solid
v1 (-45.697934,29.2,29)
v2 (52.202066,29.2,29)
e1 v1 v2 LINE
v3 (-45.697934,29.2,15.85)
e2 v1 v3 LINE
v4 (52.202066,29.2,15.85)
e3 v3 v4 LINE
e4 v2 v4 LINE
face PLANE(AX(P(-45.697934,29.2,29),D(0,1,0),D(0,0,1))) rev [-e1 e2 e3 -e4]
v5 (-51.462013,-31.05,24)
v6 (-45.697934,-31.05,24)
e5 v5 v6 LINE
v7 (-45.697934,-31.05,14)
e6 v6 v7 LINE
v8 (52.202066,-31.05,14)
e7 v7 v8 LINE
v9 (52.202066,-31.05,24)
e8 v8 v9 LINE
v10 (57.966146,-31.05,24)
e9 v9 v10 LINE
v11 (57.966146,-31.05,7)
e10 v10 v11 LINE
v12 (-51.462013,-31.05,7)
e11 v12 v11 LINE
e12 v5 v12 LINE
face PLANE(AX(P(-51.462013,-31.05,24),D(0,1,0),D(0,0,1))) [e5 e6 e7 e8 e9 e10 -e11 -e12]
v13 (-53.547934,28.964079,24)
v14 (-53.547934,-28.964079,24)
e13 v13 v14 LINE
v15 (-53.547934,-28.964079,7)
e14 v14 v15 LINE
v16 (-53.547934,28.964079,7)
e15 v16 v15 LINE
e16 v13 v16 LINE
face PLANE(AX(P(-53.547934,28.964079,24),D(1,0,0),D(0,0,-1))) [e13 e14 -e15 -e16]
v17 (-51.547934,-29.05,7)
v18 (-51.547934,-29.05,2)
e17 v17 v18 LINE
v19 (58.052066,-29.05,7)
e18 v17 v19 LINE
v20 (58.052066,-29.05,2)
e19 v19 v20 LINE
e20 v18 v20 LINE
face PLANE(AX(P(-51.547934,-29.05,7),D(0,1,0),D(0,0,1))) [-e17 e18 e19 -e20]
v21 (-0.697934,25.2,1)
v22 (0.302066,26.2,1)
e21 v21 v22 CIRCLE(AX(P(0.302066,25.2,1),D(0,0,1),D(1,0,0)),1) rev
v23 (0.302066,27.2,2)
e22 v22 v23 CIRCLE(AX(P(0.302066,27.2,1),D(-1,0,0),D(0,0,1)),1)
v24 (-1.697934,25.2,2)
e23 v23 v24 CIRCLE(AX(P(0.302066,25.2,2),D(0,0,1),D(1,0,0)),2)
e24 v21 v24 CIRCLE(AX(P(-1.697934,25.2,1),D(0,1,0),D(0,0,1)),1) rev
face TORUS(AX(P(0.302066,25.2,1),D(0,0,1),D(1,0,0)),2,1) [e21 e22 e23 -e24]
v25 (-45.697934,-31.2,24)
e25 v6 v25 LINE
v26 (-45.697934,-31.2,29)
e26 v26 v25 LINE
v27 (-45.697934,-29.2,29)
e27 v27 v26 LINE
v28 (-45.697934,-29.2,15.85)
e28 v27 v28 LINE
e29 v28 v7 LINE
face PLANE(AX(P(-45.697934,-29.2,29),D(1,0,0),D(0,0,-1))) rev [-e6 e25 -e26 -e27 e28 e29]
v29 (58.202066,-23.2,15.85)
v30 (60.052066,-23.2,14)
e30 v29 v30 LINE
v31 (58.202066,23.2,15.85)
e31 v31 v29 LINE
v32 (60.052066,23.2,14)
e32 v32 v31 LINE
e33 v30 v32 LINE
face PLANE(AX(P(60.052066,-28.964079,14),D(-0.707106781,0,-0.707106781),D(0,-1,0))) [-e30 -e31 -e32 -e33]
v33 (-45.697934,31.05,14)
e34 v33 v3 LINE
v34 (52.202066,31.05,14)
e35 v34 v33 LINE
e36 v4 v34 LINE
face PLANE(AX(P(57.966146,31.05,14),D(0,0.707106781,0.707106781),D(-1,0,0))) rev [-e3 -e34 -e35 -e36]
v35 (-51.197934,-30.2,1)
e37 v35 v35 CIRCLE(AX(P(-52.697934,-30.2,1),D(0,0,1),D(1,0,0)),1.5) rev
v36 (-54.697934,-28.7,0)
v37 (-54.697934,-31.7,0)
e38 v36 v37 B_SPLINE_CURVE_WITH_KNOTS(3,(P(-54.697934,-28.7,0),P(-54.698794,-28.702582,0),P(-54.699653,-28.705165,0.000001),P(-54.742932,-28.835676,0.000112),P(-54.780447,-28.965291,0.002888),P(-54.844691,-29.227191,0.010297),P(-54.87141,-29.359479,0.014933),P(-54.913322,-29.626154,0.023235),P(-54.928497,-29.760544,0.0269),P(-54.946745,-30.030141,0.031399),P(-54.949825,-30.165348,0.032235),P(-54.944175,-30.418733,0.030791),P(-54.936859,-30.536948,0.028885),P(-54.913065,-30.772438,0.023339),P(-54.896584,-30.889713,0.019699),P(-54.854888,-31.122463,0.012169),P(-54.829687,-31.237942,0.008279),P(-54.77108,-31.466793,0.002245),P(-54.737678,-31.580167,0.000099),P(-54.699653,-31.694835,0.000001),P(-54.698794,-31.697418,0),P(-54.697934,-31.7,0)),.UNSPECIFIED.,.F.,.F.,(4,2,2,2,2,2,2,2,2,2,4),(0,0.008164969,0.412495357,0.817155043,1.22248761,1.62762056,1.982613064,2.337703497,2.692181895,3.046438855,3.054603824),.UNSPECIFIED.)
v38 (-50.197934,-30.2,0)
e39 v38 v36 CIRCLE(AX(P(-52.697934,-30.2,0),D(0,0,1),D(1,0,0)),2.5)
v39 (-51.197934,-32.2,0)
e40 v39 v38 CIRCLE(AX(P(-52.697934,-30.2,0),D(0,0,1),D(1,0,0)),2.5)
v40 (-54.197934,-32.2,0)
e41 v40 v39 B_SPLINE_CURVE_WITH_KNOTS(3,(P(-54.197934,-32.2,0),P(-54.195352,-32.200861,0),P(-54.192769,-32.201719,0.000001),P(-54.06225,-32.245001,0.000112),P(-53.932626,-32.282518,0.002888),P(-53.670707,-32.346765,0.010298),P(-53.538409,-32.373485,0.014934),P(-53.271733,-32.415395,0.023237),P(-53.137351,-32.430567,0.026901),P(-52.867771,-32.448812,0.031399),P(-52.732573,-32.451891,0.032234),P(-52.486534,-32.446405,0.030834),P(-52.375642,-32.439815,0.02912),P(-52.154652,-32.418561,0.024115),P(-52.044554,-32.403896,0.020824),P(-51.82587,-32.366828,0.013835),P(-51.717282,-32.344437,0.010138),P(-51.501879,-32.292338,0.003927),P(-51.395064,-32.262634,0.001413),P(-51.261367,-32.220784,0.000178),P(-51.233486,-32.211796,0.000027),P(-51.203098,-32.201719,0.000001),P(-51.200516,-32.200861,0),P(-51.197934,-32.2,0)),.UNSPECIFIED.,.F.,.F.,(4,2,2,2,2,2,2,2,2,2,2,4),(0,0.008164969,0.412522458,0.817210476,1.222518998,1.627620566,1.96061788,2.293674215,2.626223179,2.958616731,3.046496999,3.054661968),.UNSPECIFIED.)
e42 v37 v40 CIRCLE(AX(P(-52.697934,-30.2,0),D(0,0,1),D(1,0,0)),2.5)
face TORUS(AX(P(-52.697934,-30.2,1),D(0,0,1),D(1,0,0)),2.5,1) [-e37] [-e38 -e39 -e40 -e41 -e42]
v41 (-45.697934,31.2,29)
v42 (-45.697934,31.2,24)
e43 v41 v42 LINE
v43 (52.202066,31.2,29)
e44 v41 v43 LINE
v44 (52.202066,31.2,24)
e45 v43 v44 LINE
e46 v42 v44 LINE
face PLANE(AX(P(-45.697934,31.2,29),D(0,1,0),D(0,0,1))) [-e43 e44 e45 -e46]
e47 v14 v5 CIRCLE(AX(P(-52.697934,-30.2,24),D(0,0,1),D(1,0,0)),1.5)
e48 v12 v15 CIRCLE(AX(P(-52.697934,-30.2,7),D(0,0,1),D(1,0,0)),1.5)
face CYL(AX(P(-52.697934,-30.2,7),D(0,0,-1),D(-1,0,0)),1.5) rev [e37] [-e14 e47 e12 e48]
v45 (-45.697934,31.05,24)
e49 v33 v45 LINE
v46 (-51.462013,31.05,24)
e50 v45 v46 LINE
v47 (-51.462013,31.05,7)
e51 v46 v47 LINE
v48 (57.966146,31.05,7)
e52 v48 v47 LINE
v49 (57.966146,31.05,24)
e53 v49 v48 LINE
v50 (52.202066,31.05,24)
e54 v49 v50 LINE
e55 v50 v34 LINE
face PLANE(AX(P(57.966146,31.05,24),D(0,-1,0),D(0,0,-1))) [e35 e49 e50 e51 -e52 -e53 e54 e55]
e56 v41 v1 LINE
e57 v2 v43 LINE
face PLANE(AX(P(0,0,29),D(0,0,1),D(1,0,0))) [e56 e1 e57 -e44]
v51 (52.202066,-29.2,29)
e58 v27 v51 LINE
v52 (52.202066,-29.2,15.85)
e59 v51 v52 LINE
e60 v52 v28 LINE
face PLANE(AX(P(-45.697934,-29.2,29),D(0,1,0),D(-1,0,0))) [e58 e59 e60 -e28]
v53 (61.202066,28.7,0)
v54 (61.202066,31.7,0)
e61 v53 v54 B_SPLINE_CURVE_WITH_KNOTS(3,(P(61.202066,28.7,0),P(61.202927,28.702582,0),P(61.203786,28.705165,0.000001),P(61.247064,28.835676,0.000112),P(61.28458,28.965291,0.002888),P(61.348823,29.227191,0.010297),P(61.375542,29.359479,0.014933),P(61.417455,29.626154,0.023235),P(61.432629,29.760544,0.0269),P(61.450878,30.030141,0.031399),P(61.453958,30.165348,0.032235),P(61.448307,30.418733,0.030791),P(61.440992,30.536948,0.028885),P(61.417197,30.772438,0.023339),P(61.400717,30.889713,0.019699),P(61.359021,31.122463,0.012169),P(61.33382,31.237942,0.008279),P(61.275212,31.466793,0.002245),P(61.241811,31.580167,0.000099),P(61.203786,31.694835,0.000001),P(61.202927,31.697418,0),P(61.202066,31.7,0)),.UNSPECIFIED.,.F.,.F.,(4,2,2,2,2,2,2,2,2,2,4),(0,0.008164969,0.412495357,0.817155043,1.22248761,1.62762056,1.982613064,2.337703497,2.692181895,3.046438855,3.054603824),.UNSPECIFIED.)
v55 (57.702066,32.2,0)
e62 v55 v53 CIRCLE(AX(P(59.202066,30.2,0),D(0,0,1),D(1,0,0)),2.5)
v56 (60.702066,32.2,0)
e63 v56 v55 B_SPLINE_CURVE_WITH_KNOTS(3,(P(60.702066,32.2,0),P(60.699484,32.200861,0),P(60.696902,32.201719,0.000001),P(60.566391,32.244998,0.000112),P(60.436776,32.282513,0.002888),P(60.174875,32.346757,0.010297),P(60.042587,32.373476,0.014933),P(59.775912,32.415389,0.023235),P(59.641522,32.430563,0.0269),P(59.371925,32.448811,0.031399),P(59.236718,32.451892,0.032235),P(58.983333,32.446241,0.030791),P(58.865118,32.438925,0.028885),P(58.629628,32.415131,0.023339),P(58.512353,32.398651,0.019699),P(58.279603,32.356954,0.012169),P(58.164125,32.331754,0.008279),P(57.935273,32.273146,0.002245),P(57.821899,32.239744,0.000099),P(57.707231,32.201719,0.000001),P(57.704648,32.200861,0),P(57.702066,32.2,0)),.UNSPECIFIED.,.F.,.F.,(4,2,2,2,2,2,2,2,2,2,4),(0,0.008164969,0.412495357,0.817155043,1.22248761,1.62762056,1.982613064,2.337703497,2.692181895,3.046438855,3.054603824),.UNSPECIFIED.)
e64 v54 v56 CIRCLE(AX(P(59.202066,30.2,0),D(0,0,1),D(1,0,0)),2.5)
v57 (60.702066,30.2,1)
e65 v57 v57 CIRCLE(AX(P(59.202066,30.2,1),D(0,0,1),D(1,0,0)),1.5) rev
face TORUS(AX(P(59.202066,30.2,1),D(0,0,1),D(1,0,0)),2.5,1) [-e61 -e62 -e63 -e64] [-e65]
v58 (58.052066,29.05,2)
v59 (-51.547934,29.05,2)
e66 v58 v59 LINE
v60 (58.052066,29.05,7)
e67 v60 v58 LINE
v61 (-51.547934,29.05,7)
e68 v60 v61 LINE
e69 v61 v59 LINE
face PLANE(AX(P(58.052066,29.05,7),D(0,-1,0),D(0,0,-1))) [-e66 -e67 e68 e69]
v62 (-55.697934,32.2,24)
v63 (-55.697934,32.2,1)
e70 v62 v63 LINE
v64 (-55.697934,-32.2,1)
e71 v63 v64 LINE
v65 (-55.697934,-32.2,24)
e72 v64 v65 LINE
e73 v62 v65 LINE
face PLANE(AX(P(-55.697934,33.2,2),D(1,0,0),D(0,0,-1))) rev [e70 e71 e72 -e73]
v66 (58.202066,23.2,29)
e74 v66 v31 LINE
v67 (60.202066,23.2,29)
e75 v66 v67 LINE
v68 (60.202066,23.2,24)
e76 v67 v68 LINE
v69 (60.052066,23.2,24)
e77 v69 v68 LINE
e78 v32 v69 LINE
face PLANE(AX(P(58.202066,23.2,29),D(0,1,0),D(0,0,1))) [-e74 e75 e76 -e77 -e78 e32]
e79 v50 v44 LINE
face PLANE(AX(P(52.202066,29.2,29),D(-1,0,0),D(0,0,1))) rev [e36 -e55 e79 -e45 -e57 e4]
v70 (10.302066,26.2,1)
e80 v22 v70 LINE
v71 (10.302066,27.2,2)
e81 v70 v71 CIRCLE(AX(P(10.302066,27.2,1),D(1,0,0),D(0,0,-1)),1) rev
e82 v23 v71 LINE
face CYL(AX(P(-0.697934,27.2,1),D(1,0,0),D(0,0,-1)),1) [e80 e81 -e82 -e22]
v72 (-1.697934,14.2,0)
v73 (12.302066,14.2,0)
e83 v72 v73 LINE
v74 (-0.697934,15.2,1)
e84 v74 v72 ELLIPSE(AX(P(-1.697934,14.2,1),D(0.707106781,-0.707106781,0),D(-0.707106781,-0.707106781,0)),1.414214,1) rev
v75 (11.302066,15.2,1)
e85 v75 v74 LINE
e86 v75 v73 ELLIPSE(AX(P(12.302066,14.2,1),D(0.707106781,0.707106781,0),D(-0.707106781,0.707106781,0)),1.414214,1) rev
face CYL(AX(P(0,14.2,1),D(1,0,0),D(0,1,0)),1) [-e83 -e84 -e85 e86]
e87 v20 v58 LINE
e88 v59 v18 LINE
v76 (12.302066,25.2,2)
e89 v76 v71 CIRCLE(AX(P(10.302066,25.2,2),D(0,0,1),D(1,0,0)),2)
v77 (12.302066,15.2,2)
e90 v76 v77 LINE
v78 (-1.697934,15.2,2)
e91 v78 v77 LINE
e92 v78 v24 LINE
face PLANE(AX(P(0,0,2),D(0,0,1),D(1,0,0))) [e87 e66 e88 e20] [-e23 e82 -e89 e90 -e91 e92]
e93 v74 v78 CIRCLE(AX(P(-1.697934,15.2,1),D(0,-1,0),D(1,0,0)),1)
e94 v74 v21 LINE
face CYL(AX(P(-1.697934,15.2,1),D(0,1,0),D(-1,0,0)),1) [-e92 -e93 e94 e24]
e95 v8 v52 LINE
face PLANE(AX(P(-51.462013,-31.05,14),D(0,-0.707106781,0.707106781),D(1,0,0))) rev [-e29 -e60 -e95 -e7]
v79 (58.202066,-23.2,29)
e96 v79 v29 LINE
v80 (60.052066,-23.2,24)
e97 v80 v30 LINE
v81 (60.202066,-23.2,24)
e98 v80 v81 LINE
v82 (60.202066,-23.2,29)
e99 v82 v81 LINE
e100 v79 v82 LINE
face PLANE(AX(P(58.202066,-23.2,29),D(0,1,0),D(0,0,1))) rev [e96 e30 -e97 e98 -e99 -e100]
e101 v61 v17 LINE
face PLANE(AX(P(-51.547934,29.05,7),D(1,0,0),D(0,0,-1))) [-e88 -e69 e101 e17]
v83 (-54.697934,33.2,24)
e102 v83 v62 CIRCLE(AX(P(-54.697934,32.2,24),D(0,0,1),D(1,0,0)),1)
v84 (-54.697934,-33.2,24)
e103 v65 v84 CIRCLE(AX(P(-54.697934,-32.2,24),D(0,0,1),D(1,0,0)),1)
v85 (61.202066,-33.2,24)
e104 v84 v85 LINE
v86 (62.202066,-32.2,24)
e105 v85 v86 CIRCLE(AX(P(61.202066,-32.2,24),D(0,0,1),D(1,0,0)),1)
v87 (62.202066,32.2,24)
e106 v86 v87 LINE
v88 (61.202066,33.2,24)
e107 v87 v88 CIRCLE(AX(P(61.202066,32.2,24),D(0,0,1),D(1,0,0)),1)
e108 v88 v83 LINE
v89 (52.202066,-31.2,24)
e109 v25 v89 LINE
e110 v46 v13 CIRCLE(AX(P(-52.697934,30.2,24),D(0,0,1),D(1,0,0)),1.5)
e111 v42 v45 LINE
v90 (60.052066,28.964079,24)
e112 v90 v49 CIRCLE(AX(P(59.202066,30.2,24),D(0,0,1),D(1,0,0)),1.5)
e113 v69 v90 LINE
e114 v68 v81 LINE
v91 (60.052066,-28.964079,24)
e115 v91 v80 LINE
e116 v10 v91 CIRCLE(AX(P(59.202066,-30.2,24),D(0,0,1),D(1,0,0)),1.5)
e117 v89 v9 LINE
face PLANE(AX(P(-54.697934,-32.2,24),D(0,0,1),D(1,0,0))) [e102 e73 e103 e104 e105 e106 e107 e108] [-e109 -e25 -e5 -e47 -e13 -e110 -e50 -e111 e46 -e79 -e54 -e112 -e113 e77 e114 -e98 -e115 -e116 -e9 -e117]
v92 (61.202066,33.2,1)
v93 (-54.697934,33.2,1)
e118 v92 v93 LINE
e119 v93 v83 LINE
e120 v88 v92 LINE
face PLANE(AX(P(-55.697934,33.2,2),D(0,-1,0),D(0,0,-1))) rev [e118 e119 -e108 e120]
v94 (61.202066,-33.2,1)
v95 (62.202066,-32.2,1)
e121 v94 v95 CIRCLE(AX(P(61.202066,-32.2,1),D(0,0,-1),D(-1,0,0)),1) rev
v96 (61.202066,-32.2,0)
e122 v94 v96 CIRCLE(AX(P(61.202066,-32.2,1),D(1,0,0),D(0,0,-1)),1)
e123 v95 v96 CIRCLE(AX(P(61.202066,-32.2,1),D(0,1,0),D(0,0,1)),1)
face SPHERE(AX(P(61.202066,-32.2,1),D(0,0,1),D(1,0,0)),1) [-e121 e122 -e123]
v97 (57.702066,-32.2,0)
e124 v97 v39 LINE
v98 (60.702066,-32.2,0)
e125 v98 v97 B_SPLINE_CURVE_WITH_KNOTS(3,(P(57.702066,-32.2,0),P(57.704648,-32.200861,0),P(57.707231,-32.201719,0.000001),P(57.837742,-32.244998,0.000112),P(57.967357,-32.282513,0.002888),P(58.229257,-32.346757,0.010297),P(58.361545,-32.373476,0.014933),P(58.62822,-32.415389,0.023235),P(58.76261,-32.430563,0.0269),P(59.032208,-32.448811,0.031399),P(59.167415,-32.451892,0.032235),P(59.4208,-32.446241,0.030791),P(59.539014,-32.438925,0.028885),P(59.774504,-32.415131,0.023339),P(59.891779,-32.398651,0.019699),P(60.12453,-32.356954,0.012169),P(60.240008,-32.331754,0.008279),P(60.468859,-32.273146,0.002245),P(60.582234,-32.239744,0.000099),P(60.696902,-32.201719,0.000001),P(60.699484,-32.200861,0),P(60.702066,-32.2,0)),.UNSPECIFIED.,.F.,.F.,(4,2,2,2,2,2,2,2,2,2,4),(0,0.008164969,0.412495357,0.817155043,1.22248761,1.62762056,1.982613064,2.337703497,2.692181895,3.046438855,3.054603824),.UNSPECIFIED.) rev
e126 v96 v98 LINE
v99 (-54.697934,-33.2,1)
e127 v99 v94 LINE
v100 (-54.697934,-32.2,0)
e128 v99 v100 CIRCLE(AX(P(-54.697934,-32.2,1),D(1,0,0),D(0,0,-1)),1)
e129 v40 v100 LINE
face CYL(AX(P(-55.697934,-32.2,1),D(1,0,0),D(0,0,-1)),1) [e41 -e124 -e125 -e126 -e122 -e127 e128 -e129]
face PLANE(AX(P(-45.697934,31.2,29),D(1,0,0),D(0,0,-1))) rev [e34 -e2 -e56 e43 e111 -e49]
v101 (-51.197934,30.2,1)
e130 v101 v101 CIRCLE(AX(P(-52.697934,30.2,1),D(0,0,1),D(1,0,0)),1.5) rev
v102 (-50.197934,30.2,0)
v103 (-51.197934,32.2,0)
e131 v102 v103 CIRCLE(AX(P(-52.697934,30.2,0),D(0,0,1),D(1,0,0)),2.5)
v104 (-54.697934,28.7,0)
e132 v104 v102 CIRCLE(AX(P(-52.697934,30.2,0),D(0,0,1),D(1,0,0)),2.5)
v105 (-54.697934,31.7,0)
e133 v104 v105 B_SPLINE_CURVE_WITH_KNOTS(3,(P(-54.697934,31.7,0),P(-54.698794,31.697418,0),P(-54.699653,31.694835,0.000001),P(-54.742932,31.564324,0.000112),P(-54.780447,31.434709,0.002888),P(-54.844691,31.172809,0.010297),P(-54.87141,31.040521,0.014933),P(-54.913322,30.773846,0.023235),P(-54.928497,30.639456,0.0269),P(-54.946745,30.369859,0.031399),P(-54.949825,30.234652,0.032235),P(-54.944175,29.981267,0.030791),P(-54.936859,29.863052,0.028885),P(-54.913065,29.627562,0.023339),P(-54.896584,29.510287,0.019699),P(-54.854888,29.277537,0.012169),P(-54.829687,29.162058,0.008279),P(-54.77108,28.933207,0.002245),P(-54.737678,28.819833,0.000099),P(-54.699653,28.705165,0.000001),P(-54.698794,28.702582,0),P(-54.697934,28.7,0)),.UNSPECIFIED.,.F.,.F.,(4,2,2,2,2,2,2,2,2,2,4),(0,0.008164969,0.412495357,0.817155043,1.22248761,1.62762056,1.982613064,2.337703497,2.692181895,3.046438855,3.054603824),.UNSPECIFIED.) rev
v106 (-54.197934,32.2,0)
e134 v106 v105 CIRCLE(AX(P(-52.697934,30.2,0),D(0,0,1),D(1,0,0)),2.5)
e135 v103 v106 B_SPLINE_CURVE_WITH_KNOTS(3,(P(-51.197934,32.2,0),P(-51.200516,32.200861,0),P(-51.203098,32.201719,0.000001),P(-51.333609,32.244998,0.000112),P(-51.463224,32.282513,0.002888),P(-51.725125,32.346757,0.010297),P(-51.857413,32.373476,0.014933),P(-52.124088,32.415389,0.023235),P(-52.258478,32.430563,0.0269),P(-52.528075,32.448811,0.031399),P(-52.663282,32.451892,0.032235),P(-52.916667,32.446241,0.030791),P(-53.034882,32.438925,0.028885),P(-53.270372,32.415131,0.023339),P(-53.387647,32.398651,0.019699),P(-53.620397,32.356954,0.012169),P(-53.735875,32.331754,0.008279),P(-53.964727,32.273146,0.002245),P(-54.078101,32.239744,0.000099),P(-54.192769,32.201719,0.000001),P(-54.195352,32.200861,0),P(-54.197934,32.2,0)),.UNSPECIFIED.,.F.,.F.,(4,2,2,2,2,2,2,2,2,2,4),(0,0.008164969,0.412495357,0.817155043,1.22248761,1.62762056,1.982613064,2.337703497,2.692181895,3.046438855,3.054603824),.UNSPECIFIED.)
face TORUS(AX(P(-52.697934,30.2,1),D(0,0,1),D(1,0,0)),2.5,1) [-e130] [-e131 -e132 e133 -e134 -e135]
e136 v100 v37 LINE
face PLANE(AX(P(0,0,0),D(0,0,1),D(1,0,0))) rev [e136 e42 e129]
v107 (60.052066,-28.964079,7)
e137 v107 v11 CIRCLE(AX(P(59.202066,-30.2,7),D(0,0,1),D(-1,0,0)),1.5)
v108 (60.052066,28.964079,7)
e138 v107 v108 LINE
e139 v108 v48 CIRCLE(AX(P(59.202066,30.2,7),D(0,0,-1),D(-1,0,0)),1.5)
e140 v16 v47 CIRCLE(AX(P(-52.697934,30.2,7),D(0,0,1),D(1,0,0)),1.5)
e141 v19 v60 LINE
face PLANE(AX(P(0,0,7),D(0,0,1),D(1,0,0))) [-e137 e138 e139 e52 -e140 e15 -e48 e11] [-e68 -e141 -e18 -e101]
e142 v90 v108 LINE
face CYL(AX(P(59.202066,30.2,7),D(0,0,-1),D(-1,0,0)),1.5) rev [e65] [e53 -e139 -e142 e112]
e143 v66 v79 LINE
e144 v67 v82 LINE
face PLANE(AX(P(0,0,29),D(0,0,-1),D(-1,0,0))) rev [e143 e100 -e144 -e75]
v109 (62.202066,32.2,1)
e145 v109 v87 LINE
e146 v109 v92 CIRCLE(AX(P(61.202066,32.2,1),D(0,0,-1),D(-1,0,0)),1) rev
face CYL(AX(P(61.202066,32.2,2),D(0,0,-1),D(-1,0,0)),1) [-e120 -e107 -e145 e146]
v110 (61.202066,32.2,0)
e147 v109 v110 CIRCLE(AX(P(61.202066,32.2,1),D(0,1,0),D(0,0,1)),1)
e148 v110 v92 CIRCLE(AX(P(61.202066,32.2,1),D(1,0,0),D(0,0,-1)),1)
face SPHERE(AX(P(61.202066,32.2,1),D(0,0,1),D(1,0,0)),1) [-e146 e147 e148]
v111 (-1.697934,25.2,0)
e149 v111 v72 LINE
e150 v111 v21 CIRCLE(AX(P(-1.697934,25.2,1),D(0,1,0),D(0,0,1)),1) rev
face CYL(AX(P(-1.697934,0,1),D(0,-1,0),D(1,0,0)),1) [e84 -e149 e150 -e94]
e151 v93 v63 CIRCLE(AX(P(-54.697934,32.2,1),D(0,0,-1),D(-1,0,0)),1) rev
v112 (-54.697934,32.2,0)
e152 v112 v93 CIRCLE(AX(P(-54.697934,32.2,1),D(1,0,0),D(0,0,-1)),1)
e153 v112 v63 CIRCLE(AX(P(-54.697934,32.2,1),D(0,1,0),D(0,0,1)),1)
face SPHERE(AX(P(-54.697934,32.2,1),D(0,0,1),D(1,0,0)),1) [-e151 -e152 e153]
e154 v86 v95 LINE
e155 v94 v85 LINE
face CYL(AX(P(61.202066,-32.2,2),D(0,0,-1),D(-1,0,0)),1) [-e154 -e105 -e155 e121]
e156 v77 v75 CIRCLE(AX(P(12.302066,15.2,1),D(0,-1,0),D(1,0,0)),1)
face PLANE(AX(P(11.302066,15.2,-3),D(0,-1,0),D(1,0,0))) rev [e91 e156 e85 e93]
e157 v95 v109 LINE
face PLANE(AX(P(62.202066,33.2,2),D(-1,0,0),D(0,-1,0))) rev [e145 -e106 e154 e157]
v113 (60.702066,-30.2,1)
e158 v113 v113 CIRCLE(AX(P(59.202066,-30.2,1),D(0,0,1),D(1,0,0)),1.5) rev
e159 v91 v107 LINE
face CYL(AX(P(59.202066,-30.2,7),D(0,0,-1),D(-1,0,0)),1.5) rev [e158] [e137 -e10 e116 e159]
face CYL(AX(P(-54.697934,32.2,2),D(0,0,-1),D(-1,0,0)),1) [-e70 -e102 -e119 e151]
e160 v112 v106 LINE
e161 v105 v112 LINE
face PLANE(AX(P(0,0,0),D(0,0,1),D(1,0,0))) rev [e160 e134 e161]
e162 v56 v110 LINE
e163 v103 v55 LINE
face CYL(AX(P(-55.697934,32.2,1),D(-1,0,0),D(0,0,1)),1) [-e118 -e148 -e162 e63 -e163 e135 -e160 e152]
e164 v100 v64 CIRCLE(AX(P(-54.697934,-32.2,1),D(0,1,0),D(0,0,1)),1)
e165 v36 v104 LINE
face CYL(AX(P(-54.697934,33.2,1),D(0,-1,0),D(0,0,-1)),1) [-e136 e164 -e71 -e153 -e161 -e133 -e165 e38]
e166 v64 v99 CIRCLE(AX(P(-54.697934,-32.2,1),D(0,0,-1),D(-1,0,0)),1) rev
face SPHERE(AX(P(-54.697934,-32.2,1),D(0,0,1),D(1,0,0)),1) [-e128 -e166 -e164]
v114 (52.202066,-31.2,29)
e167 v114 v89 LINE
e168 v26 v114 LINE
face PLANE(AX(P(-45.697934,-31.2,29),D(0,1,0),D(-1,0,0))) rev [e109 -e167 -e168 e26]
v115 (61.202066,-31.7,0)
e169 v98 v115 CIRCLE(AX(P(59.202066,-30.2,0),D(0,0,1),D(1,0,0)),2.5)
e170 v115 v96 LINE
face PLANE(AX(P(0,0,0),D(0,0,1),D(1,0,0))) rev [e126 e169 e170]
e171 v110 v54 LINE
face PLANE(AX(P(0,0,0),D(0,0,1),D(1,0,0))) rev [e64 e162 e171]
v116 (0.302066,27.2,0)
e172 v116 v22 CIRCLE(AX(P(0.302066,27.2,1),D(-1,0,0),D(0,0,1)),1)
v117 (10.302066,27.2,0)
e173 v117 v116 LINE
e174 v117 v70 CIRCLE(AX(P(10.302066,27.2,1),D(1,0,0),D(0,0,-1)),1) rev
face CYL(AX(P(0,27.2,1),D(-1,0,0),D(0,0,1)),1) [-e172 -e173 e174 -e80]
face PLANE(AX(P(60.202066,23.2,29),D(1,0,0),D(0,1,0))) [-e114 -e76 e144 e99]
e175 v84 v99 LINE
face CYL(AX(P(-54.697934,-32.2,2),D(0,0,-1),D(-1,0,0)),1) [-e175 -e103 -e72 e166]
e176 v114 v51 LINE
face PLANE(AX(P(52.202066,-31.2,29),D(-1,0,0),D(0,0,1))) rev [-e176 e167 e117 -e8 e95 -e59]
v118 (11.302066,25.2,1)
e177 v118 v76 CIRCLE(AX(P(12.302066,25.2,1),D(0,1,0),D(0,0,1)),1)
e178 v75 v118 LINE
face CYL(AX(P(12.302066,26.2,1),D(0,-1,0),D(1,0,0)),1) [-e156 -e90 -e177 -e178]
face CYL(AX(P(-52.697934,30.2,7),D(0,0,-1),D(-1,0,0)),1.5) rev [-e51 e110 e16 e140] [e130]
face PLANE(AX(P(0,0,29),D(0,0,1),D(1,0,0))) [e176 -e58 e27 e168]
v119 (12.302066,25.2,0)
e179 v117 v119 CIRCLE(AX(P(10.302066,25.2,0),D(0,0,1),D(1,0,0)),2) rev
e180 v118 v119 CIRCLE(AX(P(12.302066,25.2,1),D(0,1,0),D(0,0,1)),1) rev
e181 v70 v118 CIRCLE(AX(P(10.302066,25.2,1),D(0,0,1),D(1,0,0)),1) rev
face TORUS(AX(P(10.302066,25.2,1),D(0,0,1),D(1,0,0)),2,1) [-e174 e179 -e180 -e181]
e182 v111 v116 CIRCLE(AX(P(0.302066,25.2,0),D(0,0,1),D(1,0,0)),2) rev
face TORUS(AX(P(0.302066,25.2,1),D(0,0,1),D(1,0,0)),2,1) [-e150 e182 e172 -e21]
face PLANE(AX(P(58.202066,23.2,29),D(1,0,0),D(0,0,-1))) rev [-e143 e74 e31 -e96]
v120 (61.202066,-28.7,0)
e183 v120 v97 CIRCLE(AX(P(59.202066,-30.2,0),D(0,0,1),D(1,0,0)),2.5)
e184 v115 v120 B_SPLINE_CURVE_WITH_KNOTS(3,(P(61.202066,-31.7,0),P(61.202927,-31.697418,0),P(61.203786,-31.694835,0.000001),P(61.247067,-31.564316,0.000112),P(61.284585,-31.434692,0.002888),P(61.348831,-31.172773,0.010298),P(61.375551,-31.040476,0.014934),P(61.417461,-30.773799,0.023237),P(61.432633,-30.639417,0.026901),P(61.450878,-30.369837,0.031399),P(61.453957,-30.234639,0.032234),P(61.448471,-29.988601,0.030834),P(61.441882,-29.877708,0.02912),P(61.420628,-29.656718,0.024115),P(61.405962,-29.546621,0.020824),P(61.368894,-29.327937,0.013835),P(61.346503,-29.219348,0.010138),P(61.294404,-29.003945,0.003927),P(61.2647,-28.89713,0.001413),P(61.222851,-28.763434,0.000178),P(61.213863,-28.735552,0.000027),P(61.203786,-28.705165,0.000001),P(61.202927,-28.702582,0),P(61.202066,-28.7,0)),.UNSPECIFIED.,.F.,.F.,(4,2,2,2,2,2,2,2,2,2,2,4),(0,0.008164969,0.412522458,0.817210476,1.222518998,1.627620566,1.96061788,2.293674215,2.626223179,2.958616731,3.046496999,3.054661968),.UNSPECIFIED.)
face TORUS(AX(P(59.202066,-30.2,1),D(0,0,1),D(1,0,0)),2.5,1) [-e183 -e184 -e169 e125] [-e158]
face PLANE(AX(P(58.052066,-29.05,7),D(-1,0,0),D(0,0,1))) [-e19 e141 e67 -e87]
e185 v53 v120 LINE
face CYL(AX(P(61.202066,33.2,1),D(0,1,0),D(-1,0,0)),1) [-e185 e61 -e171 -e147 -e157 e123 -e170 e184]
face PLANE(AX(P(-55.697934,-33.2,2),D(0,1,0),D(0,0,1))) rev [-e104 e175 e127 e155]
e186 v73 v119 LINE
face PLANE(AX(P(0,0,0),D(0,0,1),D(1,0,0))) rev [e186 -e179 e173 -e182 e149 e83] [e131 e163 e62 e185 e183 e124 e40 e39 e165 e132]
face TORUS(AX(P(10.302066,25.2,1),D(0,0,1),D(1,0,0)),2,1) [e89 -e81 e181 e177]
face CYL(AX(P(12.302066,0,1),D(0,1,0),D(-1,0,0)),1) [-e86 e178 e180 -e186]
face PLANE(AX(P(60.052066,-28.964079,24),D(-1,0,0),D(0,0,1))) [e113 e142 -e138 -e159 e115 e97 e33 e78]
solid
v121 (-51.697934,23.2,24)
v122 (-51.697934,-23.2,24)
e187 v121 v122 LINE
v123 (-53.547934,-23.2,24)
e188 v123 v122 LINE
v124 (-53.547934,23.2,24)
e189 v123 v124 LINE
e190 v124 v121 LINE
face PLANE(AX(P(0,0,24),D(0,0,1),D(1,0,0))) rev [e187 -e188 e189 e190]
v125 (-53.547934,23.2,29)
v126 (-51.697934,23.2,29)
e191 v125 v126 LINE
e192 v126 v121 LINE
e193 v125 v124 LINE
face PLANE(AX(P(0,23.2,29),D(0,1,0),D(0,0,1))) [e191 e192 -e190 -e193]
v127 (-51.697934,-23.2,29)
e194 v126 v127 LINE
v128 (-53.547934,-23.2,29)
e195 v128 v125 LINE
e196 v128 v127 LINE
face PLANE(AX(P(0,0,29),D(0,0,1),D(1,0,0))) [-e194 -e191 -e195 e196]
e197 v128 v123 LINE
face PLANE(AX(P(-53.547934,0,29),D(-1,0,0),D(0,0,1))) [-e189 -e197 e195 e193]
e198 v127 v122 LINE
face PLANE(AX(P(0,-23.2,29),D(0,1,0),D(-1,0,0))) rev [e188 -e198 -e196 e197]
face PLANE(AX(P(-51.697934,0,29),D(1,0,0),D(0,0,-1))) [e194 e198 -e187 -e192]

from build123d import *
from build123d.topology import SkipClean

# Parameters (mm, degrees)
BOSS_EXTRUDE1_DEPTH                        = 2
SKETCH2_W                                  = 113.60000000000001
SKETCH2_H                                  = 62.1
SKETCH2_W_2                                = 109.60000000000001
SKETCH2_H_2                                = 58.1
BOSS_EXTRUDE2_DEPTH                        = 5
SKETCH3_R                                  = 1.5000000000000042
CUT_EXTRUDE2_DEPTH                         = 71.85433681838424
MIRROR3_AT_THE_SECOND_PLANE_COPY_1_SKETC_R = 1.5000000000000042
MIRROR3_AT_THE_SECOND_PLANE_COPY_1_DEPTH   = 71.85433681838424
FILLET1_R                                  = 1
FILLET2_R                                  = 1
BOSS_EXTRUDE3_DEPTH                        = 22
SKETCH7_W                                  = 97.9
SKETCH7_H                                  = 1.999999999999993
BOSS_EXTRUDE4_DEPTH                        = 5
CHAMFER1_SIZE                              = 10
CHAMFER2_SIZE                              = 10
CUT_EXTRUDE3_DEPTH                         = 5
FILLET3_R                                  = 1


# Some blends are built 0.0001 mm under size
with BuildPart() as part:
    # Sketch1 → Boss-Extrude1 (new body)
    with BuildSketch(Plane.XY):
        Polygon((-55.697933748362985, 33.2), (62.20206625163701, 33.2), (62.202066251637014, -33.2), (-55.697933748362985, -33.2), align=None)
    extrude(amount=BOSS_EXTRUDE1_DEPTH)

    # Sketch2 → Boss-Extrude2 (add)
    with BuildSketch(Plane.XY.offset(2)):
        with Locations((3.252066251637011, 0)):
            Rectangle(SKETCH2_W, SKETCH2_H)
        with Locations((3.252066251637011, 0)):
            Rectangle(SKETCH2_W_2, SKETCH2_H_2, mode=Mode.SUBTRACT)
    extrude(amount=BOSS_EXTRUDE2_DEPTH)

    # Sketch3 → Cut-Extrude2 (cut, symmetric)
    with BuildSketch(Plane(origin=(0, 0, 0), x_dir=(-1, 0, 0), z_dir=(0, 0, -1))):
        with Locations(Location((-59.202066251637, 30.200000000000003, 0), (0, 0, 34.518107841))):
            Circle(SKETCH3_R)
    cut_extrude2 = extrude(amount=CUT_EXTRUDE2_DEPTH, both=True, mode=Mode.SUBTRACT)

    # Mirror2: Cut-Extrude2 across plane
    add(cut_extrude2.mirror(Plane.ZX), mode=Mode.SUBTRACT)

    # Mirror3: Cut-Extrude2 across plane
    add(cut_extrude2.mirror(Plane.ZX), mode=Mode.SUBTRACT)

    # Mirror3 at the second plane: Cut-Extrude2 across plane
    add(cut_extrude2.mirror(Plane(origin=(3.2520662516370114, 0, 0), x_dir=(0, 0, 1), z_dir=(1, 0, 0))), mode=Mode.SUBTRACT)

    # Mirror3 at the second plane copy 1 sketc → Mirror3 at the second plane copy 1 (cut, symmetric)
    with BuildSketch(Plane(origin=(6.504132503274023, 0, 0), x_dir=(1, 0, 0), z_dir=(0, 0, -1))):
        with Locations(Location((-59.202066251637, 30.200000000000003, 0), (0, 0, 34.518107841))):
            Circle(MIRROR3_AT_THE_SECOND_PLANE_COPY_1_SKETC_R)
    extrude(amount=MIRROR3_AT_THE_SECOND_PLANE_COPY_1_DEPTH, both=True, mode=Mode.SUBTRACT)

    # Fillet1
    fillet1_edges = [part.edges().sort_by_distance(p)[0] for p in [
        (62.202066251637014, -33.2, 1),
        (-55.697933748362985, -33.2, 1),
        (-55.697933748362985, 33.2, 1),
        (62.20206625163701, 33.2, 1),
    ]]
    fillet(fillet1_edges, radius=FILLET1_R)

    # Fillet2
    # the kernel refuses this fillet: 1 mm, written as the material it takes off along each edge
    with BuildSketch(Plane(origin=(62.20206625163701, 32.2, 0), x_dir=(-1, -1.1e-16, 0), z_dir=(1.1e-16, -1, 0)), Plane(origin=(-55.697933748362985, -32.2, 0), x_dir=(1, 0, 0), z_dir=(0, 1, 0))) as fillet2_piece_1:
        with BuildLine():
            CenterArc((FILLET2_R, -FILLET2_R), FILLET2_R, 90, 90)
            Line((0, -FILLET2_R), (0, 0))
            Line((0, 0), (FILLET2_R, 0))
        make_face()
    extrude(amount=64.4, mode=Mode.SUBTRACT)
    with BuildSketch(Plane(origin=(61.202066251637014, -33.2, 0), x_dir=(0, 1, 0), z_dir=(-1, 0, 0))) as fillet2_piece_2:
        with BuildLine():
            CenterArc((FILLET2_R, -FILLET2_R), FILLET2_R, 90, 90)
            Line((0, -FILLET2_R), (0, 0))
            Line((0, 0), (FILLET2_R, 0))
        make_face()
    extrude(amount=115.9, mode=Mode.SUBTRACT)
    with BuildSketch(Plane(origin=(-54.697933748362985, 33.2, 0), x_dir=(0, 0, 1), z_dir=(1, 0, 0))) as fillet2_piece_3:
        with BuildLine():
            CenterArc((FILLET2_R, FILLET2_R), FILLET2_R, 180, 90)
            Line((-1.1e-16, FILLET2_R), (0, 0))
            Line((0, 0), (FILLET2_R, 0))
        make_face()
    extrude(amount=115.89999999999999, mode=Mode.SUBTRACT)
    with BuildSketch(Plane(origin=(-54.697933748362985, -32.2, 0), x_dir=(-1, 0, 0), z_dir=(0, 1, 0))) as fillet2_piece_4:
        with BuildLine():
            CenterArc((1 - FILLET2_R, FILLET2_R), FILLET2_R, 270, 90)
            Line((1, FILLET2_R), (1, 0))
            Line((1, 0), (1 - FILLET2_R, 0))
        make_face()
    revolve(axis=Axis((-54.697933748362985, -32.2, 0), (0, 0, 1)), revolution_arc=90, mode=Mode.SUBTRACT)
    with BuildSketch(Plane(origin=(-54.697933748362985, 32.2, 0), x_dir=(0, 1, 0), z_dir=(1, 0, 0))) as fillet2_piece_5:
        with BuildLine():
            CenterArc((1 - FILLET2_R, FILLET2_R), FILLET2_R, 270, 90)
            Line((1, FILLET2_R), (1, 0))
            Line((1, 0), (1 - FILLET2_R, 0))
        make_face()
    revolve(axis=Axis((-54.697933748362985, 32.2, 0), (0, 0, 1)), revolution_arc=90, mode=Mode.SUBTRACT)
    with BuildSketch(Plane(origin=(61.20206625163701, 32.2, 0), x_dir=(0, 1, 0), z_dir=(-1, 0, 0))) as fillet2_piece_6:
        with BuildLine():
            CenterArc((1 - FILLET2_R, -FILLET2_R), FILLET2_R, 6.36e-15, 90)
            Line((1, -FILLET2_R), (1, 0))
            Line((1, 0), (1 - FILLET2_R, 0))
        make_face()
    revolve(axis=Axis((61.20206625163701, 32.2, 0), (0, 0, -1)), revolution_arc=90, mode=Mode.SUBTRACT)
    with BuildSketch(Plane(origin=(61.202066251637014, -32.2, 0), x_dir=(1, 0, 0), z_dir=(0, 1, 0))) as fillet2_piece_7:
        with BuildLine():
            CenterArc((1 - FILLET2_R, -FILLET2_R), FILLET2_R, 6.36e-15, 90)
            Line((1, -FILLET2_R), (1, 0))
            Line((1, 0), (1 - FILLET2_R, 0))
        make_face()
    revolve(axis=Axis((61.202066251637014, -32.2, 0), (0, 0, -1)), revolution_arc=90, mode=Mode.SUBTRACT)
    with BuildSketch(Plane(origin=(59.202066251637, 30.200000000000003, 0), x_dir=(-0.8239471396211576, 0.5666666666657856, 0), z_dir=(-0.5666666666657856, -0.8239471396211576, 0))) as fillet2_piece_8:
        with BuildLine():
            CenterArc((1.5000000000000024 + FILLET2_R, -FILLET2_R), FILLET2_R, 90, 90)
            Line((1.5000000000000024, -FILLET2_R), (1.5000000000000024, 0))
            Line((1.5000000000000024, 0), (1.5000000000000024 + FILLET2_R, 0))
        make_face()
    revolve(axis=Axis((59.202066251637, 30.200000000000003, 0), (0, 0, -1)), mode=Mode.SUBTRACT)
    with BuildSketch(Plane(origin=(59.202066251637, -30.200000000000003, 0), x_dir=(-0.8239471396211576, -0.5666666666657856, 0), z_dir=(0.5666666666657856, -0.8239471396211576, 0))) as fillet2_piece_9:
        with BuildLine():
            CenterArc((1.5000000000000024 + FILLET2_R, -FILLET2_R), FILLET2_R, 90, 90)
            Line((1.5000000000000024, -FILLET2_R), (1.5000000000000024, 0))
            Line((1.5000000000000024, 0), (1.5000000000000024 + FILLET2_R, 0))
        make_face()
    revolve(axis=Axis((59.202066251637, -30.200000000000003, 0), (0, 0, -1)), mode=Mode.SUBTRACT)
    with BuildSketch(Plane(origin=(-52.69793374836298, 30.200000000000003, 0), x_dir=(0.8239471396211576, 0.5666666666657856, 0), z_dir=(-0.5666666666657856, 0.8239471396211576, 0))) as fillet2_piece_10:
        with BuildLine():
            CenterArc((1.5000000000000024 + FILLET2_R, -FILLET2_R), FILLET2_R, 90, 90)
            Line((1.5000000000000062, -FILLET2_R), (1.5000000000000024, 0))
            Line((1.5000000000000024, 0), (1.5000000000000024 + FILLET2_R, 0))
        make_face()
    revolve(axis=Axis((-52.69793374836298, 30.200000000000003, 0), (0, 0, -1)), mode=Mode.SUBTRACT)
    with BuildSketch(Plane(origin=(-52.69793374836298, -30.200000000000003, 0), x_dir=(0.8239471396211576, -0.5666666666657856, 0), z_dir=(0.5666666666657856, 0.8239471396211576, 0))) as fillet2_piece_11:
        with BuildLine():
            CenterArc((1.5000000000000024 + FILLET2_R, -FILLET2_R), FILLET2_R, 90, 90)
            Line((1.5000000000000062, -FILLET2_R), (1.5000000000000024, 0))
            Line((1.5000000000000024, 0), (1.5000000000000024 + FILLET2_R, 0))
        make_face()
    revolve(axis=Axis((-52.69793374836298, -30.200000000000003, 0), (0, 0, -1)), mode=Mode.SUBTRACT)

    # Sketch5 → Boss-Extrude3 (add)
    with SkipClean():  # the faces are left unmerged after this step: merging them gives an invalid solid
        with BuildSketch(Plane.XY.offset(2)):
            with BuildLine():
                Line((-54.697933748362985, -33.2), (61.202066251637014, -33.2))
                ThreePointArc((61.202066251637014, -33.2), (61.90917303282356, -32.90710678118655), (62.202066251637014, -32.2))
                Line((62.202066251637014, -32.2), (62.20206625163701, 32.2))
                ThreePointArc((62.20206625163701, 32.2), (61.90917303282355, 32.907106781186556), (61.202066251637, 33.2))
                Line((61.202066251637, 33.2), (-54.697933748362985, 33.2))
                ThreePointArc((-54.697933748362985, 33.2), (-55.40504052954953, 32.90710678118655), (-55.697933748362985, 32.2))
                Line((-55.697933748362985, 32.2), (-55.697933748362985, -32.199999999999974))
                ThreePointArc((-55.697933748362985, -32.199999999999974), (-55.405040529549545, -32.90710678118654), (-54.697933748362985, -33.2))
            make_face()
            with BuildLine():
                Line((-51.46201303893214, -31.05), (57.966145542206164, -31.05))
                ThreePointArc((57.966145542206164, -31.05), (60.262726423416815, -31.260660171779836), (60.052066251637015, -28.96407929056918))
                Line((60.052066251637015, -28.96407929056918), (60.052066251637015, 28.96407929056918))
                ThreePointArc((60.052066251637015, 28.96407929056918), (60.262726423416815, 31.260660171779836), (57.966145542206164, 31.05))
                Line((57.966145542206164, 31.05), (-51.46201303893214, 31.05))
                ThreePointArc((-51.46201303893214, 31.05), (-53.7585939201428, 31.260660171779833), (-53.547933748362986, 28.964079290569178))
                Line((-53.547933748362986, 28.964079290569178), (-53.547933748362986, -28.964079290569178))
                ThreePointArc((-53.547933748362986, -28.964079290569178), (-53.75859392014279, -31.260660171779833), (-51.46201303893214, -31.05))
            make_face(mode=Mode.SUBTRACT)
        extrude(amount=BOSS_EXTRUDE3_DEPTH)

    # Sketch7 → Boss-Extrude4 (add)
    with SkipClean():  # the faces are left unmerged after this step: merging them gives an invalid solid
        with BuildSketch(Plane.XY.offset(24)):
            Polygon((-51.69793374836299, 23.2), (-53.547933748362986, 23.2), (-53.547933748362986, -23.2), (-51.69793374836299, -23.199999999999992), align=None)
            with Locations((3.252066251637011, 30.2)):
                Rectangle(SKETCH7_W, SKETCH7_H)
            Polygon((-45.69793374836298, -29.199999999999996), (52.20206625163701, -29.200000000000003), (52.20206625163701, -31.200000000000003), (-45.69793374836298, -31.200000000000006), align=None)
            Polygon((58.202066251637014, 23.2), (58.202066251637014, -23.200000000000006), (60.202066251637, -23.200000000000006), (60.202066251637014, 23.2), align=None)
        extrude(amount=BOSS_EXTRUDE4_DEPTH)


with BuildPart() as boss_extrude4_piece_1:
    # of the separate pieces the step leaves, piece 1, a body of its own (boss_extrude4_pieces)
    add(part.part.solids().sort_by_distance((61.202066252, 33.2, 1))[0])

    # Chamfer1
    # the kernel refuses this chamfer: 10 mm, written as the material it adds along each edge
    with BuildSketch(Plane(origin=(-45.69793374836298, -31.05, 24), x_dir=(0, -0.027495876610586317, -0.9996219169112968), z_dir=(1, 0, 0))) as chamfer1_piece_1_section:
        Polygon((CHAMFER1_SIZE * 0.999621916911, CHAMFER1_SIZE * 0.0274958766106), (-CHAMFER1_SIZE * 0.0274958766106, CHAMFER1_SIZE * 0.999621916911), (0, 0), align=None)
    chamfer1_piece_1 = extrude(amount=97.89999999999998, mode=Mode.PRIVATE)
    chamfer1_piece_1 = split(chamfer1_piece_1, bisect_by=Plane(origin=(3.2520662516369896, -29.2, 19.44678604224059), z_dir=(-7e-17, -1, 0)), keep=Keep.TOP, mode=Mode.PRIVATE)
    add(chamfer1_piece_1)
    with BuildSketch(Plane(origin=(52.20206625163702, 31.05, 24), x_dir=(0, 0.027495876610586317, -0.9996219169112968), z_dir=(-1, 0, 0))) as chamfer1_piece_2_section:
        Polygon((CHAMFER1_SIZE * 0.999621916911, CHAMFER1_SIZE * 0.0274958766106), (-CHAMFER1_SIZE * 0.0274958766106, CHAMFER1_SIZE * 0.999621916911), (0, 0), align=None)
    chamfer1_piece_2 = extrude(amount=97.90000000000002, mode=Mode.PRIVATE)
    chamfer1_piece_2 = split(chamfer1_piece_2, bisect_by=Plane(origin=(3.252066251637011, 29.200000000000003, 19.446786042240586), z_dir=(0, 1, 0)), keep=Keep.TOP, mode=Mode.PRIVATE)
    add(chamfer1_piece_2)

    # Chamfer2
    # the kernel refuses this chamfer: 10 mm, written as the material it adds along each edge
    with BuildSketch(Plane(origin=(60.052066251637015, -23.200000000000006, 24), x_dir=(0.027495876610586317, 0, -0.9996219169112968), z_dir=(0, 1, 0))) as chamfer2_piece_1_section:
        Polygon((CHAMFER2_SIZE * 0.999621916911, CHAMFER2_SIZE * 0.0274958766106), (-CHAMFER2_SIZE * 0.0274958766106, CHAMFER2_SIZE * 0.999621916911), (0, 0), align=None)
    chamfer2_piece_1 = extrude(amount=46.400000000000006, mode=Mode.PRIVATE)
    chamfer2_piece_1 = split(chamfer2_piece_1, bisect_by=Plane(origin=(58.202066251637014, 0, 19.446786042240586), z_dir=(1, 0, 0)), keep=Keep.TOP, mode=Mode.PRIVATE)
    add(chamfer2_piece_1)

    # Sketch8 → Cut-Extrude3 (cut)
    with BuildSketch(Plane.XY.offset(2)):
        Polygon((-0.69793374836298, 26.200000000000003), (11.302066251637006, 26.200000000000003), (11.302066251637001, 15.199999999999998), (-0.6979337483629935, 15.200000000000001), align=None)
    extrude(amount=-CUT_EXTRUDE3_DEPTH, mode=Mode.SUBTRACT)

    # Fillet3
    fillet3_edges = [boss_extrude4_piece_1.edges().sort_by_distance(p)[0] for p in [
        (-0.6979337483629867, 20.700000000000003, 0),
        (5.302066251637012, 26.200000000000003, 0),
        (-0.69793374836298, 26.200000000000003, 1),
        (11.302066251637005, 20.7, 0),
        (11.302066251637006, 26.200000000000003, 1),
        (5.302066251637004, 15.2, 0),
        (-0.6979337483629868, 20.700000000000003, 2),
        (11.302066251637005, 20.7, 2),
        (5.3020662516370125, 26.200000000000003, 2),
    ]]
    fillet(fillet3_edges, radius=FILLET3_R - 0.0001)  # a hair under: the kernel refuses the full size


with BuildPart() as boss_extrude4_piece_2:
    # of the separate pieces the step leaves, piece 2, a body of its own (boss_extrude4_pieces)
    add(part.part.solids().sort_by_distance((-51.697933748, 23.2, 24))[0])


solid = Compound([boss_extrude4_piece_1.part, boss_extrude4_piece_2.part])
